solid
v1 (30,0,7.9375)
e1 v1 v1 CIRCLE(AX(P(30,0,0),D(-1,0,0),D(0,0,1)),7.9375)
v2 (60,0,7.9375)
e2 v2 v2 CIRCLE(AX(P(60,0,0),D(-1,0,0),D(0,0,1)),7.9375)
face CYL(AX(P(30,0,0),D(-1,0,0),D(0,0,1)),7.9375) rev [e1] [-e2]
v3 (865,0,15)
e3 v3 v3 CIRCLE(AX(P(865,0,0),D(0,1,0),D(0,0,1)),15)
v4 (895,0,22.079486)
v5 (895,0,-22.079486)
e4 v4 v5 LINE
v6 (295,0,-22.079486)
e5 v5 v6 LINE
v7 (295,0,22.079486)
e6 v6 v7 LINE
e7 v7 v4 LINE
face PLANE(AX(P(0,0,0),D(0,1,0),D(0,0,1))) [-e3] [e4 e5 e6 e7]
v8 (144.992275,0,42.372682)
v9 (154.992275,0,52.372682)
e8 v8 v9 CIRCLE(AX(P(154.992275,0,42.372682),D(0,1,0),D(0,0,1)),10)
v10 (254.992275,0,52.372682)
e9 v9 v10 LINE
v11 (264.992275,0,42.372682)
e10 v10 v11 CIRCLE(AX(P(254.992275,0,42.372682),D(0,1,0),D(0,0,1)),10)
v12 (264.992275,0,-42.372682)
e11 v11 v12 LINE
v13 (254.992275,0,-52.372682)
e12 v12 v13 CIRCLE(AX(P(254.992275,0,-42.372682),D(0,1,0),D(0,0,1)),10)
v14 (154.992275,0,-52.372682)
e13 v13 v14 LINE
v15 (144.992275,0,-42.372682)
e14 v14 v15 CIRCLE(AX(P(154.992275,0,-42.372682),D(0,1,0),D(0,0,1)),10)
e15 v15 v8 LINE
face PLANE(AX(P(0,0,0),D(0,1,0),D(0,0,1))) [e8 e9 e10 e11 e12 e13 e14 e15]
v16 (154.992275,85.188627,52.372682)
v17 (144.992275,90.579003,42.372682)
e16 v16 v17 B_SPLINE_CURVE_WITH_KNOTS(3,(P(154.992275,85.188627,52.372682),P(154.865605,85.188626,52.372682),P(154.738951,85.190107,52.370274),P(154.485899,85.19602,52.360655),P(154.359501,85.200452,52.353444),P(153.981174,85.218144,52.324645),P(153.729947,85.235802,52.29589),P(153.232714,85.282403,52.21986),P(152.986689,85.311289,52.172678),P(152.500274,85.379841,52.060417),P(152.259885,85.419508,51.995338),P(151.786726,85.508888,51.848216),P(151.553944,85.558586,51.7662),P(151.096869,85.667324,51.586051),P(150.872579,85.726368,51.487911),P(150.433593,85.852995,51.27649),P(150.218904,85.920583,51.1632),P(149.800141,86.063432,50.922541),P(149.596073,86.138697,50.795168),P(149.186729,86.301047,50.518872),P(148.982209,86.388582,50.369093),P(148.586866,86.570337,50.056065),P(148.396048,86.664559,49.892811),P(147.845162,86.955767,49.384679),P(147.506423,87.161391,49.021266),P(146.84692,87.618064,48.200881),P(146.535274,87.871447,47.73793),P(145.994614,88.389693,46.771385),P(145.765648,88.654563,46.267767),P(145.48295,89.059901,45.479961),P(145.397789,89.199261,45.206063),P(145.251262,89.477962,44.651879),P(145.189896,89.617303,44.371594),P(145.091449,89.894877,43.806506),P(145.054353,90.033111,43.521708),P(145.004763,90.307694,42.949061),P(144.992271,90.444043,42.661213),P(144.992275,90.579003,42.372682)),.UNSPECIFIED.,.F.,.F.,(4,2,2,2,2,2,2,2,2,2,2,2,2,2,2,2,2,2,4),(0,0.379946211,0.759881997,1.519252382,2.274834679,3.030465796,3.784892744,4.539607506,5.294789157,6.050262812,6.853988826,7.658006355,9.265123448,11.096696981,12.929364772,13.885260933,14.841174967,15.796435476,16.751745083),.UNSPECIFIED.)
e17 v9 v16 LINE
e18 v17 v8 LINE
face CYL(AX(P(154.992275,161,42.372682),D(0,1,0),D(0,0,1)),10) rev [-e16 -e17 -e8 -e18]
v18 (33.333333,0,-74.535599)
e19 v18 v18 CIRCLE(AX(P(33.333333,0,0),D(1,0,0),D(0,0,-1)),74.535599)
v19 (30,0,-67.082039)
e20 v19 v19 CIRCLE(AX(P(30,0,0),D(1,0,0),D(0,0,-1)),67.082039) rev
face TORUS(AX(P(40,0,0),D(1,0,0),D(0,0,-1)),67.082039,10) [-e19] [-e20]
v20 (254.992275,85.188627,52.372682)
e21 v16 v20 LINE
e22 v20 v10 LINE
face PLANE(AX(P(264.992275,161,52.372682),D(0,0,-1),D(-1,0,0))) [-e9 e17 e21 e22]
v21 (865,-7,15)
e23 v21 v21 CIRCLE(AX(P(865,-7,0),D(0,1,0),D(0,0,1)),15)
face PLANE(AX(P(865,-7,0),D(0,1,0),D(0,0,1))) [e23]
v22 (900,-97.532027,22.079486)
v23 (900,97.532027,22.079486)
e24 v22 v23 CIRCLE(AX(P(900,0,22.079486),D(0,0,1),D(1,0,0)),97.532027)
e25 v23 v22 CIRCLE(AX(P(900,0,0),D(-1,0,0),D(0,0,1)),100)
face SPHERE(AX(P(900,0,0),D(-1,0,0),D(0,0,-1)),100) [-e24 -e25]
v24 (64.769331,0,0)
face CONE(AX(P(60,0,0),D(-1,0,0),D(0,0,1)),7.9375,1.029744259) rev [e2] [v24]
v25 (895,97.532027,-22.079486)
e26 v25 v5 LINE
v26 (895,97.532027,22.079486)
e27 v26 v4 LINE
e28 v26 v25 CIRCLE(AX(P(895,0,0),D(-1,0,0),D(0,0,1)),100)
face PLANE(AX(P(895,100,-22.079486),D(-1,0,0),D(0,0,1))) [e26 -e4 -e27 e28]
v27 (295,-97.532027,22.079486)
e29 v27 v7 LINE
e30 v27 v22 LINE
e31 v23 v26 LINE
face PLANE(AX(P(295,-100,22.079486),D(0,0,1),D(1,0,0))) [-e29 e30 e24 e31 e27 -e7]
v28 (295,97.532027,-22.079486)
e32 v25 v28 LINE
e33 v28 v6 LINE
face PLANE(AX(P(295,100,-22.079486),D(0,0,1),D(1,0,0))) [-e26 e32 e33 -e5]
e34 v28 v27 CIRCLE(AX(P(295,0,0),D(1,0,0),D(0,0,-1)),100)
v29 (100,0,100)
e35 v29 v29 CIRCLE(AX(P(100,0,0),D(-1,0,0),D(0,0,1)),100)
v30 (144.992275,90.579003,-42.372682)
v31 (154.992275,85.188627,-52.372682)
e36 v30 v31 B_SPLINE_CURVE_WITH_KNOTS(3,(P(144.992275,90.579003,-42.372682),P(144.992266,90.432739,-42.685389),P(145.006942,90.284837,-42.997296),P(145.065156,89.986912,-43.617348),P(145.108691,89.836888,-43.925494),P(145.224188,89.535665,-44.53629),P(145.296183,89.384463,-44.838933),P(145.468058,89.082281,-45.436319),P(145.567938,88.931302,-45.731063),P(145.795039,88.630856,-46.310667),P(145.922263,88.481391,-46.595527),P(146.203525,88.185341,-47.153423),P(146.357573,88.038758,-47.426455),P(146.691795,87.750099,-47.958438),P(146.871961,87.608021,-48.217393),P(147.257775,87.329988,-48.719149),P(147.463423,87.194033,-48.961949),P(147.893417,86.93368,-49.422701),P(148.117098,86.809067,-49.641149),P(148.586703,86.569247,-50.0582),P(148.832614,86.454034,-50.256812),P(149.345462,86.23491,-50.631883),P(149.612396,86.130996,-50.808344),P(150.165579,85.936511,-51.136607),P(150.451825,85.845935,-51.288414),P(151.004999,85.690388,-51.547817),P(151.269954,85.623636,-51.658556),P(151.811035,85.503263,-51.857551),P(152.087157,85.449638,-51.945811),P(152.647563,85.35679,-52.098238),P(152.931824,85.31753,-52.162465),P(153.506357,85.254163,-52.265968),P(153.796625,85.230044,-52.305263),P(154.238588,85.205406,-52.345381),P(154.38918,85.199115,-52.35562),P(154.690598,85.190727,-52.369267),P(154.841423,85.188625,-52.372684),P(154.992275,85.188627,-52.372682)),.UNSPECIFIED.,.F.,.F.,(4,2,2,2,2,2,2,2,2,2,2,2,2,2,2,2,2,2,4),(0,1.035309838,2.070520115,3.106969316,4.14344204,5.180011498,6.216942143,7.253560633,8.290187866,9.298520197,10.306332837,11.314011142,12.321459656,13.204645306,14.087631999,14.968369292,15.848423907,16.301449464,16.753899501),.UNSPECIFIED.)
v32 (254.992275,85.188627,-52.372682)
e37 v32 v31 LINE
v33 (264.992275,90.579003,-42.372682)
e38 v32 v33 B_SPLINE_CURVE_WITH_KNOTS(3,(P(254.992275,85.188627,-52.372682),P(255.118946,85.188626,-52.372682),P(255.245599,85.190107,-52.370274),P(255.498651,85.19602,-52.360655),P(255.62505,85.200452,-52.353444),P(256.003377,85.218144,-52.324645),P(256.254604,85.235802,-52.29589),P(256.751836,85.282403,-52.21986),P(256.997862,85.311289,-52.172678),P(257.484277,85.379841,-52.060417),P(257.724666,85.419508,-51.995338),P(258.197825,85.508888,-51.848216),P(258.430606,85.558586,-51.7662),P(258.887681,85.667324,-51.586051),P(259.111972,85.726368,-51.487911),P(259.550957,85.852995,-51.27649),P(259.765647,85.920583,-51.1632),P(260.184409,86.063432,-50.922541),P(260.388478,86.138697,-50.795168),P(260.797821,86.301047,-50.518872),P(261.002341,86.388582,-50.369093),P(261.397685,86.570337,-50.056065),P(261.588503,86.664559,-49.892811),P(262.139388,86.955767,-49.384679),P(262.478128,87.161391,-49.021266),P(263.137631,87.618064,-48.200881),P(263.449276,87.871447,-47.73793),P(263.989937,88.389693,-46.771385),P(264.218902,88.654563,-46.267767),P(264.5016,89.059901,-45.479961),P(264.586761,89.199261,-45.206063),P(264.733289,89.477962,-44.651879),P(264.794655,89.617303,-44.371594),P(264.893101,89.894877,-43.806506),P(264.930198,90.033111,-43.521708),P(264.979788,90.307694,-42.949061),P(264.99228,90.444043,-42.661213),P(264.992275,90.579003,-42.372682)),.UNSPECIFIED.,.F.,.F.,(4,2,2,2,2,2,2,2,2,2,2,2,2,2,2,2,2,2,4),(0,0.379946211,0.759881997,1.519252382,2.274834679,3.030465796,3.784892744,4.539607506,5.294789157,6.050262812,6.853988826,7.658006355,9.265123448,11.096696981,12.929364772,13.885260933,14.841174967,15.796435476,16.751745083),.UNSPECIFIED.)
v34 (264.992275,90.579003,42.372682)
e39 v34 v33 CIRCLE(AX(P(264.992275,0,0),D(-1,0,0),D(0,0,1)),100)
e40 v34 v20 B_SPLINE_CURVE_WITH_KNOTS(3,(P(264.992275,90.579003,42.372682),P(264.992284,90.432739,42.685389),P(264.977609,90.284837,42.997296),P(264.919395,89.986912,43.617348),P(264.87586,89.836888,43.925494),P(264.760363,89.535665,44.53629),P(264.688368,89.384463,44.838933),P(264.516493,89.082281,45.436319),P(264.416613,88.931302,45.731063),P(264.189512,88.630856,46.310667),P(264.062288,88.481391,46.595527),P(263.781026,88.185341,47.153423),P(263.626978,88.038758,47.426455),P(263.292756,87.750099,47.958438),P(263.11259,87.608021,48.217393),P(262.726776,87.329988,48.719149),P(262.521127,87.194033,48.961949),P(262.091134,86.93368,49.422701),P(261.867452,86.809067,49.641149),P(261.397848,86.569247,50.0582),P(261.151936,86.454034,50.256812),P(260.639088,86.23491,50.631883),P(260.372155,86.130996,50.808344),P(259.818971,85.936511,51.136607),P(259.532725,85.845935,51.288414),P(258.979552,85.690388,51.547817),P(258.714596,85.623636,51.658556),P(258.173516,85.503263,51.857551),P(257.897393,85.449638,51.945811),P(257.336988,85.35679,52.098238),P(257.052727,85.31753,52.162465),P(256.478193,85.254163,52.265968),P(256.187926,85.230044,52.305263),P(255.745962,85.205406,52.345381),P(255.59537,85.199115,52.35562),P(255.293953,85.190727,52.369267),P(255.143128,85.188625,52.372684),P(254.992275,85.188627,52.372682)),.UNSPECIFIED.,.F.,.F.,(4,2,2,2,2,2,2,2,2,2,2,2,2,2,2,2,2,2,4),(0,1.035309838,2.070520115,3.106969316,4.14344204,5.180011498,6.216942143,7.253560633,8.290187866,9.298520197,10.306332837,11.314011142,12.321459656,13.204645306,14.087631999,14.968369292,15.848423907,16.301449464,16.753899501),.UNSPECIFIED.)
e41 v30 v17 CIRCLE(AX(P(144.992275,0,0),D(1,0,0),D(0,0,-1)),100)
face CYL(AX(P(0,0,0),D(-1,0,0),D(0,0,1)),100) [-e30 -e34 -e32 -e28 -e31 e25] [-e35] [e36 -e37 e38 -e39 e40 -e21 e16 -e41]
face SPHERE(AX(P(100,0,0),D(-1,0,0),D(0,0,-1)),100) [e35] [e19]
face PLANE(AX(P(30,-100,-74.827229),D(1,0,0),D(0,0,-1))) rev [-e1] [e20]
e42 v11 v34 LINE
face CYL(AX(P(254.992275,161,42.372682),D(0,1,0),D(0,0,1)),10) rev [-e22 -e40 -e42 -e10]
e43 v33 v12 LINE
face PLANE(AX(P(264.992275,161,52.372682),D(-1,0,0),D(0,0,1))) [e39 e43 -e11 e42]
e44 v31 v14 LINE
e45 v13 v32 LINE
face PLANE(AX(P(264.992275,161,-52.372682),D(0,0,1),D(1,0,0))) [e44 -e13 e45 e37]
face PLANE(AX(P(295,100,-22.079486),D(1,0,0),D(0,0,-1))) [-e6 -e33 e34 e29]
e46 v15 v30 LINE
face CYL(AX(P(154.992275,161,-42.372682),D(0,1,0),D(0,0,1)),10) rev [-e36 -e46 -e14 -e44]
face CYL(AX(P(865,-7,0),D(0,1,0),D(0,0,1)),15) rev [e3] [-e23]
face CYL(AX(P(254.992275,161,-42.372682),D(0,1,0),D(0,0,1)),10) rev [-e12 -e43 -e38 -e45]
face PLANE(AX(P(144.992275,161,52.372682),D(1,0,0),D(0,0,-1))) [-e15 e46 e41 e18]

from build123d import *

# Parameters (mm, degrees)
CUT_EXTRUDE7_DEPTH               = 1010.950493836
CUT_EXTRUDE7_DEPTH_BACK          = 1010.950493836
SKETCH13_W                       = 48.176434887
SKETCH13_H                       = 155.804640487
SKETCH4_W                        = 600
SKETCH4_H                        = 44.158972604
CUT_EXTRUDE2_DEPTH               = 1010.950493836
SKETCH7_W                        = 159.807953253
SKETCH7_H                        = 69.49104999
BOSS_EXTRUDE7_DEPTH              = 5
FILLET5_R                        = 10
F_5_8_0_625_DIAMETER_HOLE1_D     = 15.875
F_5_8_0_625_DIAMETER_HOLE1_DEPTH = 30
F_5_8_0_625_DIAMETER_HOLE1_TIP   = 4.769331164
BOSS_EXTRUDE8_DEPTH              = 10
BOSS_EXTRUDE8_DEPTH_BACK         = 10
SKETCH16_W                       = 57.403477863
SKETCH16_H                       = 23.203595883
SKETCH17_W                       = 38.256761469
SKETCH17_H                       = 12.64819079
BOSS_EXTRUDE9_DEPTH              = 10
SKETCH18_W                       = 120
SKETCH18_H                       = 104.74536306
CUT_EXTRUDE8_DEPTH               = 161
FILLET6_R                        = 10
SKETCH19_R                       = 15
CUT_EXTRUDE9_DEPTH               = 7
CUT_EXTRUDE11_DEPTH              = 1010.950493856
CUT_EXTRUDE11_DEPTH_BACK         = 1010.950493856
SKETCH22_W                       = 1481.455902665
SKETCH22_H                       = 524.99926461


# Read off the part's stored shape, not the designer's step: Revolve1
with BuildPart() as part:
    # Revolve1 outline → Revolve1 (revolve)
    with BuildSketch(Plane.YX):
        with BuildLine():
            Line((0, 1000), (0, 0))
            ThreePointArc((0, 0), (70.710678154, 29.289321917), (100, 100.0000001))
            Line((100, 100.0000001), (100, 899.9999999))
            ThreePointArc((100, 899.9999999), (70.710678154, 970.710678083), (0, 1000))
        make_face()
    revolve(axis=Axis((0, 0, 0), (1, 0, 0)))

    # Sketch13 → Cut-Extrude7 (cut, two sides: drawn at the far end of the back side and taken through both)
    with BuildSketch(Plane(origin=(0, 0, 0), x_dir=(1, 0, 0), z_dir=(0, 1, 0)).offset(-CUT_EXTRUDE7_DEPTH_BACK)):
        with Locations((5.911782557, -3.075091589)):
            Rectangle(SKETCH13_W, SKETCH13_H)
    extrude(amount=CUT_EXTRUDE7_DEPTH + CUT_EXTRUDE7_DEPTH_BACK, mode=Mode.SUBTRACT)

    # Sketch4 → Cut-Extrude2 (cut, through all)
    with BuildSketch(Plane(origin=(0, 0, 0), x_dir=(1, 0, 0), z_dir=(0, 1, 0))):
        with Locations((595, 0)):
            Rectangle(SKETCH4_W, SKETCH4_H)
    extrude(amount=CUT_EXTRUDE2_DEPTH, mode=Mode.SUBTRACT)

    # Sketch7 → Boss-Extrude7 (add)
    with BuildSketch(Plane(origin=(0, 0, 0), x_dir=(1, 0, 0), z_dir=(0, 1, 0))):
        with Locations((745.885521462, -1.405844332)):
            Rectangle(SKETCH7_W, SKETCH7_H)
    extrude(amount=-BOSS_EXTRUDE7_DEPTH)

    # Fillet5
    fillet5_edges = [part.edges().sort_by_distance(p)[0] for p in [
        (30, -71.414284286, 0),
    ]]
    fillet(fillet5_edges, radius=FILLET5_R)

    # 5/8 (0.625) Diameter Hole1
    with Locations(Plane.ZY.offset(-30)):
        with Locations((0, 0)):
            Hole(F_5_8_0_625_DIAMETER_HOLE1_D / 2, depth=F_5_8_0_625_DIAMETER_HOLE1_DEPTH)
            with Locations((0, 0, -(F_5_8_0_625_DIAMETER_HOLE1_DEPTH + F_5_8_0_625_DIAMETER_HOLE1_TIP / 2))):  # 118° drill point
                Cone(0, F_5_8_0_625_DIAMETER_HOLE1_D / 2, F_5_8_0_625_DIAMETER_HOLE1_TIP, mode=Mode.SUBTRACT)

    # Sketch16 → Boss-Extrude8 (add, two sides: drawn at the far end of the back side and taken through both)
    with BuildSketch(Plane.XY.offset(-BOSS_EXTRUDE8_DEPTH_BACK)):
        with Locations((738.294537666, -11.601797942)):
            Rectangle(SKETCH16_W, SKETCH16_H)
    extrude(amount=BOSS_EXTRUDE8_DEPTH + BOSS_EXTRUDE8_DEPTH_BACK)

    # Sketch17 → Boss-Extrude9 (add)
    with BuildSketch(Plane.XY.offset(-22.079486302)):
        with Locations((787.071835847, 6.324095395)):
            Rectangle(SKETCH17_W, SKETCH17_H)
    extrude(amount=-BOSS_EXTRUDE9_DEPTH)

    # Sketch18 → Cut-Extrude8 (cut)
    with BuildSketch(Plane(origin=(0, 0, 0), x_dir=(1, 0, 0), z_dir=(0, 1, 0))):
        with Locations((204.992275313, 0)):
            Rectangle(SKETCH18_W, SKETCH18_H)
    extrude(amount=CUT_EXTRUDE8_DEPTH, mode=Mode.SUBTRACT)

    # Fillet6
    fillet6_edges = [part.edges().sort_by_distance(p)[0] for p in [
        (144.992275313, 42.594313674, -52.37268153),
        (144.992275313, 42.594313674, 52.37268153),
        (264.992275313, 42.594313674, 52.37268153),
        (264.992275313, 42.594313674, -52.37268153),
    ]]
    fillet(fillet6_edges, radius=FILLET6_R)

    # Sketch19 → Cut-Extrude9 (cut)
    with BuildSketch(Plane(origin=(0, 0, 0), x_dir=(1, 0, 0), z_dir=(0, 1, 0))):
        with Locations(Location((865, 0, 0), (0, 0, 270))):
            Circle(SKETCH19_R)
    extrude(amount=-CUT_EXTRUDE9_DEPTH, mode=Mode.SUBTRACT)

    # Sketch22 → Cut-Extrude11 (cut, two sides: drawn at the far end of the back side and taken through both)
    with BuildSketch(Plane(origin=(0, 0, 0), x_dir=(1, 0, 0), z_dir=(0, 1, 0)).offset(-CUT_EXTRUDE11_DEPTH_BACK)):
        with Locations((406.155110175, 0)):
            Rectangle(SKETCH22_W, SKETCH22_H)
        Polygon((-101.289974143, 163.942834617), (1092.059469606, 163.942834617), (1092.059469606, -22.079486302), (295, -22.079486302), (295, -179.828704734), (-101.289974143, -179.828704734), (-101.289974143, -22.079486302), align=None, mode=Mode.SUBTRACT)
    extrude(amount=CUT_EXTRUDE11_DEPTH + CUT_EXTRUDE11_DEPTH_BACK, mode=Mode.SUBTRACT)


solid = part.part
